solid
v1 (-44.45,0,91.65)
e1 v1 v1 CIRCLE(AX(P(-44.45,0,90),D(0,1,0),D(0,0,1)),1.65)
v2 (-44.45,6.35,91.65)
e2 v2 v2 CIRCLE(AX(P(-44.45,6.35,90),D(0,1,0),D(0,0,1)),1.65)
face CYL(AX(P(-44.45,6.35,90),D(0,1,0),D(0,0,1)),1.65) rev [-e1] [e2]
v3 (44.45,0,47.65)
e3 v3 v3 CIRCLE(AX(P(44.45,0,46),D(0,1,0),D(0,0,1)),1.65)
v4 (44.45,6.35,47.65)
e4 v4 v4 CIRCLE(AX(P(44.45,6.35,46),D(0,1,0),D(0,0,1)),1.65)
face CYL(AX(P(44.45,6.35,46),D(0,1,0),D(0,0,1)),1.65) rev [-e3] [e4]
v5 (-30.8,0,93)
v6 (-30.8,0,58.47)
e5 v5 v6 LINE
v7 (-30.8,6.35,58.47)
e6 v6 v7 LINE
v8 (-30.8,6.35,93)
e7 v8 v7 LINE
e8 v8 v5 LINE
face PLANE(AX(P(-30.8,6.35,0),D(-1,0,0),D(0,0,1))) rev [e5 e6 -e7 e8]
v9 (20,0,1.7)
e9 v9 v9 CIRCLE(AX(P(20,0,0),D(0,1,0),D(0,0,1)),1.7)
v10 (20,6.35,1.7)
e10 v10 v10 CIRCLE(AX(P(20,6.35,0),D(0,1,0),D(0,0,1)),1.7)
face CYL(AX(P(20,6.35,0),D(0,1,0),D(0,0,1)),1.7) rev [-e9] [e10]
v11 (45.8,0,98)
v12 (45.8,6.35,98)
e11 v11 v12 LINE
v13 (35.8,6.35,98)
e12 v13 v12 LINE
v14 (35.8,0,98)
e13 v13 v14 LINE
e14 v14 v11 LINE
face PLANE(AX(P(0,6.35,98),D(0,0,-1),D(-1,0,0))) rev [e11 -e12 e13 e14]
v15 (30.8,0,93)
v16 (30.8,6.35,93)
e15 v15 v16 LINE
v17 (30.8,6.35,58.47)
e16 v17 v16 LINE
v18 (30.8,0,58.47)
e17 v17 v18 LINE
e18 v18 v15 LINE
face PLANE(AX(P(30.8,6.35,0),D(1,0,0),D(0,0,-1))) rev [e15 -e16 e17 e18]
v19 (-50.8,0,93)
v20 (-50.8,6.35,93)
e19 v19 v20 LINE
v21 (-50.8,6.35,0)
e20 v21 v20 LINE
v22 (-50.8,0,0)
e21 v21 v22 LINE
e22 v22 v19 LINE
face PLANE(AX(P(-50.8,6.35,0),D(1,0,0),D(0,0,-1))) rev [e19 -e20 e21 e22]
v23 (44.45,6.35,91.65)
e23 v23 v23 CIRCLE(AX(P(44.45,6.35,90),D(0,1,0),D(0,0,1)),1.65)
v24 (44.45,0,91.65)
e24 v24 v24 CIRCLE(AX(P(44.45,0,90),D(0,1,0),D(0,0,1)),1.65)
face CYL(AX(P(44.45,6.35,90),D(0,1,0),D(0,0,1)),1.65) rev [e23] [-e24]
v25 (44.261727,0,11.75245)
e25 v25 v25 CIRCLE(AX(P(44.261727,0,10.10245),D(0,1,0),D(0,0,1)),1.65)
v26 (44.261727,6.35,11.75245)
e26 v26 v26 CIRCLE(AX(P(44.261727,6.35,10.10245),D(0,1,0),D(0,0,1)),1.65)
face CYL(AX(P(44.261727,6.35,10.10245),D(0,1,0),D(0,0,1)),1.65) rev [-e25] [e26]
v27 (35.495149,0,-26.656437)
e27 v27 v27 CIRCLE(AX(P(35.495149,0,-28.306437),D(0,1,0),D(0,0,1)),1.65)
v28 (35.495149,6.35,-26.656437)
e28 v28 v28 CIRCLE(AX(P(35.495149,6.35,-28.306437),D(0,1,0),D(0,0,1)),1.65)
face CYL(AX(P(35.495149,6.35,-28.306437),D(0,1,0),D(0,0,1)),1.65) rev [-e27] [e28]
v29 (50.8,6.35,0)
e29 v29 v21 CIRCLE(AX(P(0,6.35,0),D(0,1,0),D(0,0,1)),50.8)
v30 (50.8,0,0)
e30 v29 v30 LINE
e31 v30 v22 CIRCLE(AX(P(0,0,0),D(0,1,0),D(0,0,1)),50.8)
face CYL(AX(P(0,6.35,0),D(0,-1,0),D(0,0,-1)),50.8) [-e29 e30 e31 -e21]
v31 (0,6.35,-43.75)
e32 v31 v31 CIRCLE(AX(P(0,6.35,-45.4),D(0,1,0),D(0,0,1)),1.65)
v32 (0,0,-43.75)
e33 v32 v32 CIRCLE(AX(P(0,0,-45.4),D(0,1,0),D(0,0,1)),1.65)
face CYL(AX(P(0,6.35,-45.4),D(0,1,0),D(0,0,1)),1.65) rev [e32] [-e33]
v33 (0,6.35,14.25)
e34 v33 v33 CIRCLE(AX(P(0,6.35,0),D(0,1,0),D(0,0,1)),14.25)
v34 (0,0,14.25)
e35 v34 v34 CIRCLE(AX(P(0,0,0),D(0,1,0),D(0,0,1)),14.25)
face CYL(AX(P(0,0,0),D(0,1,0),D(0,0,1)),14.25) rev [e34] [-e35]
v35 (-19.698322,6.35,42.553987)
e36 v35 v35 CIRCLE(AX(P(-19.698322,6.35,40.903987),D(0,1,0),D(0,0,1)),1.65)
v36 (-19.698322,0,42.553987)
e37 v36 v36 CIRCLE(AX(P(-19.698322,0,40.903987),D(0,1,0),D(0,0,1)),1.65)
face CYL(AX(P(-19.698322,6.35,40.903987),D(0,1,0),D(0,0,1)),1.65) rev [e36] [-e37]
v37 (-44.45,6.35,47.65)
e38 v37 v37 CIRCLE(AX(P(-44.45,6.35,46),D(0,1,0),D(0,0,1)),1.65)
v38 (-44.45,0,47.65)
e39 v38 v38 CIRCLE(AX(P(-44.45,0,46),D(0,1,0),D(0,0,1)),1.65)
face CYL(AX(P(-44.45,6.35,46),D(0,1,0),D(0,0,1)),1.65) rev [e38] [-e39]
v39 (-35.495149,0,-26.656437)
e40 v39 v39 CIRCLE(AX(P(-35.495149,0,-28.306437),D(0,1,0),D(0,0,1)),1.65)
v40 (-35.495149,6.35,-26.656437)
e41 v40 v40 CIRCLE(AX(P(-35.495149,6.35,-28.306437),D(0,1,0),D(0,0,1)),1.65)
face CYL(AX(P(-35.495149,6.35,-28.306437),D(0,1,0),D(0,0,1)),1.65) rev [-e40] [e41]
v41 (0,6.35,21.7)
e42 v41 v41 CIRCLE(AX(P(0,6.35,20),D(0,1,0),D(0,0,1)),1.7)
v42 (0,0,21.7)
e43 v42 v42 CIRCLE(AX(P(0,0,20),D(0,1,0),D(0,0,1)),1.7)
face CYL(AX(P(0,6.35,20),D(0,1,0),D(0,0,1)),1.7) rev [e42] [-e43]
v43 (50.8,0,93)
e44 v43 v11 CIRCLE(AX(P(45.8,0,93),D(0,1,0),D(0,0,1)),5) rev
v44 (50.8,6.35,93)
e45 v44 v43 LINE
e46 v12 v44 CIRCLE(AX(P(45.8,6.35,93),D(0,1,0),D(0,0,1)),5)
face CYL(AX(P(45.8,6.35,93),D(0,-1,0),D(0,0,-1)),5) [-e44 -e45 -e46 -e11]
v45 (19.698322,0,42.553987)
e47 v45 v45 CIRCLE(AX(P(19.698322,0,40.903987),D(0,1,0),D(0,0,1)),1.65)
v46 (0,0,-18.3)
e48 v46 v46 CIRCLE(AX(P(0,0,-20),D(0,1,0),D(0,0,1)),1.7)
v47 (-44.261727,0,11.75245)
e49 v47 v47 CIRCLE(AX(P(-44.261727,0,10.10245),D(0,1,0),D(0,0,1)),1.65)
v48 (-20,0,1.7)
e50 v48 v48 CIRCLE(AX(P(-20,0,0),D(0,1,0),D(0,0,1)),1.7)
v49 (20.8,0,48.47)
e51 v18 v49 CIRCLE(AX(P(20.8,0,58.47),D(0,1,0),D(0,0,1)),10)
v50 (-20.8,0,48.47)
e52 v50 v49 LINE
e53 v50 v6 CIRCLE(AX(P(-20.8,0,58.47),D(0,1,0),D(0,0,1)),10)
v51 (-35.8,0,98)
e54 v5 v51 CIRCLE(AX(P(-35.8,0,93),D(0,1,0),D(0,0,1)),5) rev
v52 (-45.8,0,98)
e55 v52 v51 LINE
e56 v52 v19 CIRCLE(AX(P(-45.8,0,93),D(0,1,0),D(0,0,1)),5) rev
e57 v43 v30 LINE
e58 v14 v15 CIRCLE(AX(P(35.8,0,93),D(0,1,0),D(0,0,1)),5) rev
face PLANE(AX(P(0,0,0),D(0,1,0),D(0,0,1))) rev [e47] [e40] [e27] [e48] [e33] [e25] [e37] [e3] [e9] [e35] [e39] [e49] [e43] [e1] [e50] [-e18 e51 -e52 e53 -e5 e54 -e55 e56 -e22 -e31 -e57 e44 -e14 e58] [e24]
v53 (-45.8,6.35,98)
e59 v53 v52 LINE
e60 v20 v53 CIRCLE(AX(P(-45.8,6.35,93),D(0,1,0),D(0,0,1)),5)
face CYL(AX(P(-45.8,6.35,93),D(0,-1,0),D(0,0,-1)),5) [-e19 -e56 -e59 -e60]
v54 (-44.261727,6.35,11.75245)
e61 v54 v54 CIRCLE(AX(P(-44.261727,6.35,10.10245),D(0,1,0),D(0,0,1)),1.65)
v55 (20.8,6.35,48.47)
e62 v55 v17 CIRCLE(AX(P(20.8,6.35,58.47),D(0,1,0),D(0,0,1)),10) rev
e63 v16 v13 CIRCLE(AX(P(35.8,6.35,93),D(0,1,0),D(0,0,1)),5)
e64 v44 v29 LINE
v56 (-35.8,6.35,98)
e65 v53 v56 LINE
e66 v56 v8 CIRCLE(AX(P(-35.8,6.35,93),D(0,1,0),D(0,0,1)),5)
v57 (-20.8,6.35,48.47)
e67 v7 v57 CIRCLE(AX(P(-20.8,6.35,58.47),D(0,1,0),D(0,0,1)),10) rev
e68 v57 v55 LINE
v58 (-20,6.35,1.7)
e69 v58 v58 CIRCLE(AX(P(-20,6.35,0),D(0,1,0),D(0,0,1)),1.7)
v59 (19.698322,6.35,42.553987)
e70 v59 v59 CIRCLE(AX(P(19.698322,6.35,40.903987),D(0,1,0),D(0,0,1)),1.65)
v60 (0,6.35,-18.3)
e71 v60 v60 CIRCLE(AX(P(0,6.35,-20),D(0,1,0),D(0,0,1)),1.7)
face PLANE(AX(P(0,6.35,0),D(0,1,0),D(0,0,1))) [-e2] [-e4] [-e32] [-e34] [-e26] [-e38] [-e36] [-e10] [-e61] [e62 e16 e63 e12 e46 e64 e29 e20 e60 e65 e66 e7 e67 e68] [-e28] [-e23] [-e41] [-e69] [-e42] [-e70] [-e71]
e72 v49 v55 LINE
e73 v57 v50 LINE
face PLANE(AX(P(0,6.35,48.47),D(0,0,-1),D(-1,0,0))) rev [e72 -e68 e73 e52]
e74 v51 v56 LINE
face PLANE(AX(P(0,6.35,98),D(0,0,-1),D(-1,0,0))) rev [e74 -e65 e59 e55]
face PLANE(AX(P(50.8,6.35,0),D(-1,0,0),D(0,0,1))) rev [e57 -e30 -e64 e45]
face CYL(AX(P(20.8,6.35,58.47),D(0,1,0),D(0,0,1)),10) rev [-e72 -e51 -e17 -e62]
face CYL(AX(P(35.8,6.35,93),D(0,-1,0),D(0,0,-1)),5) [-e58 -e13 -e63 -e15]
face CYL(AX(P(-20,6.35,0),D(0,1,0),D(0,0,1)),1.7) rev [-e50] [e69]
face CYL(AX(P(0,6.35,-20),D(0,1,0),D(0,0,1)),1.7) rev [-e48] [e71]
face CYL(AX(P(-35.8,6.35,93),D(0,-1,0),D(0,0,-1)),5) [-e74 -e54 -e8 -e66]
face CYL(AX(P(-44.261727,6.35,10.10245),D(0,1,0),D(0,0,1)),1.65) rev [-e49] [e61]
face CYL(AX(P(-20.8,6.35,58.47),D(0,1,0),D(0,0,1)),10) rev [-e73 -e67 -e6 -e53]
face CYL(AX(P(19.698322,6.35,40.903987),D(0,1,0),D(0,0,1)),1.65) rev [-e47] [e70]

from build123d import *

# Parameters (mm, degrees)
BOSS_EXTRUDE1_DEPTH          = 6.35
FILLET1_R                    = 10
M4X0_7_TAPPED_HOLE1_D        = 3.3
M4X0_7_TAPPED_HOLE2_D        = 3.3
FILLET2_R                    = 5
CUT_EXTRUDE1_DEPTH           = 111.566552356
CUT_EXTRUDE1_DEPTH_BACK      = 111.566552356
SKETCH10_R                   = 14.25
M3_CLEARANCE_HOLE1_OUTLINE_R = 1.7
M3_CLEARANCE_HOLE1_DEPTH     = 6.35


# Read off the part's stored shape, not the designer's step: M3 Clearance Hole1
with BuildPart() as part:
    # Sketch2 → Boss-Extrude1 (new body)
    with BuildSketch(Plane(origin=(0, 0, 0), x_dir=(1, 0, 0), z_dir=(0, 1, 0))):
        with BuildLine():
            Line((-36.071416662, -35.77), (-50.8, -35.77))
            Line((-50.8, -35.77), (-50.8, -98))
            Line((-50.8, -98), (-30.8, -98))
            Line((-30.8, -98), (-30.8, -48.47))
            Line((-30.8, -48.47), (-15.208520638, -48.47))
            ThreePointArc((-15.208520638, -48.47), (-26.414588628, -43.392505201), (-36.071416662, -35.77))
        make_face()
        with BuildLine():
            Line((0, -35.77), (-36.071416662, -35.77))
            ThreePointArc((-36.071416662, -35.77), (-26.414588628, -43.392505201), (-15.208520638, -48.47))
            Line((-15.208520638, -48.47), (0, -48.47))
            Line((0, -48.47), (0, -35.77))
        make_face()
        with BuildLine():
            Line((36.071416662, -35.77), (0, -35.77))
            Line((0, -35.77), (0, -48.47))
            Line((0, -48.47), (15.208520638, -48.47))
            ThreePointArc((15.208520638, -48.47), (26.414588628, -43.392505201), (36.071416662, -35.77))
        make_face()
        with BuildLine():
            Line((50.8, -98), (50.8, -35.77))
            Line((50.8, -35.77), (36.071416662, -35.77))
            ThreePointArc((36.071416662, -35.77), (26.414588628, -43.392505201), (15.208520638, -48.47))
            Line((15.208520638, -48.47), (30.8, -48.47))
            Line((30.8, -48.47), (30.8, -98))
            Line((30.8, -98), (50.8, -98))
        make_face()
        with BuildLine():
            Line((50.8, -35.77), (50.8, 0))
            ThreePointArc((50.8, 0), (46.973758453, -19.34182041), (36.071416662, -35.77))
            Line((36.071416662, -35.77), (50.8, -35.77))
        make_face()
        with BuildLine():
            Line((50.8, 0), (0, 0))
            Line((0, 0), (0, -35.77))
            Line((0, -35.77), (36.071416662, -35.77))
            ThreePointArc((36.071416662, -35.77), (46.973758453, -19.34182041), (50.8, 0))
        make_face()
        with BuildLine():
            ThreePointArc((50.8, 0), (0, 50.8), (-50.8, 0))
            Line((-50.8, 0), (0, 0))
            Line((0, 0), (50.8, 0))
        make_face()
        with BuildLine():
            Line((0, 0), (-50.8, 0))
            ThreePointArc((-50.8, 0), (-46.973758453, -19.34182041), (-36.071416662, -35.77))
            Line((-36.071416662, -35.77), (0, -35.77))
            Line((0, -35.77), (0, 0))
        make_face()
        with BuildLine():
            ThreePointArc((-36.071416662, -35.77), (-46.973758453, -19.34182041), (-50.8, 0))
            Line((-50.8, 0), (-50.8, -35.77))
            Line((-50.8, -35.77), (-36.071416662, -35.77))
        make_face()
    extrude(amount=BOSS_EXTRUDE1_DEPTH)

    # Fillet1
    fillet1_edges = [part.edges().sort_by_distance(p)[0] for p in [
        (30.8, 3.175, 48.47),
        (-30.8, 3.175, 48.47),
    ]]
    fillet(fillet1_edges, radius=FILLET1_R)

    # M4x0.7 Tapped Hole1 (through all)
    with Locations(Plane(origin=(0, 6.35, 0), x_dir=(1, 0, 0), z_dir=(0, 1, 0))):
        with Locations((-44.45, -46), (-44.45, -90), (44.45, -90), (44.45, -46)):
            Hole(M4X0_7_TAPPED_HOLE1_D / 2)

    # M4x0.7 Tapped Hole2 (through all)
    with Locations(Plane(origin=(0, 6.35, 0), x_dir=(1, 0, 0), z_dir=(0, 1, 0))):
        with Locations((-19.698321756, -40.903986603), (19.698321756, -40.903986603), (-44.261727213, -10.102450402), (-35.495149304, 28.306437004), (0, 45.4), (35.495149304, 28.306437004), (44.261727213, -10.102450402)):
            Hole(M4X0_7_TAPPED_HOLE2_D / 2)

    # Fillet2
    fillet2_edges = [part.edges().sort_by_distance(p)[0] for p in [
        (50.8, 3.175, 98),
        (30.8, 3.175, 98),
        (-30.8, 3.175, 98),
        (-50.8, 3.175, 98),
    ]]
    fillet(fillet2_edges, radius=FILLET2_R)

    # Sketch10 → Cut-Extrude1 (cut, two sides: drawn at the far end of the back side and taken through both)
    with BuildSketch(Plane(origin=(0, 6.35, 0), x_dir=(1, 0, 0), z_dir=(0, 1, 0)).offset(-CUT_EXTRUDE1_DEPTH_BACK)):
        with Locations(Location((0, 0, 0), (0, 0, 270))):
            Circle(SKETCH10_R)
    extrude(amount=CUT_EXTRUDE1_DEPTH + CUT_EXTRUDE1_DEPTH_BACK, mode=Mode.SUBTRACT)

    # M3 Clearance Hole1 outline → M3 Clearance Hole1 (cut)
    with BuildSketch(Plane(origin=(0, 0, 0), x_dir=(1, 0, 0), z_dir=(0, 1, 0))):
        with Locations((-20, 0)):
            Circle(M3_CLEARANCE_HOLE1_OUTLINE_R)
        with Locations((20, 0)):
            Circle(M3_CLEARANCE_HOLE1_OUTLINE_R)
        with Locations((0, 20)):
            Circle(M3_CLEARANCE_HOLE1_OUTLINE_R)
        with Locations((0, -20)):
            Circle(M3_CLEARANCE_HOLE1_OUTLINE_R)
    extrude(amount=M3_CLEARANCE_HOLE1_DEPTH, mode=Mode.SUBTRACT)


solid = part.part
